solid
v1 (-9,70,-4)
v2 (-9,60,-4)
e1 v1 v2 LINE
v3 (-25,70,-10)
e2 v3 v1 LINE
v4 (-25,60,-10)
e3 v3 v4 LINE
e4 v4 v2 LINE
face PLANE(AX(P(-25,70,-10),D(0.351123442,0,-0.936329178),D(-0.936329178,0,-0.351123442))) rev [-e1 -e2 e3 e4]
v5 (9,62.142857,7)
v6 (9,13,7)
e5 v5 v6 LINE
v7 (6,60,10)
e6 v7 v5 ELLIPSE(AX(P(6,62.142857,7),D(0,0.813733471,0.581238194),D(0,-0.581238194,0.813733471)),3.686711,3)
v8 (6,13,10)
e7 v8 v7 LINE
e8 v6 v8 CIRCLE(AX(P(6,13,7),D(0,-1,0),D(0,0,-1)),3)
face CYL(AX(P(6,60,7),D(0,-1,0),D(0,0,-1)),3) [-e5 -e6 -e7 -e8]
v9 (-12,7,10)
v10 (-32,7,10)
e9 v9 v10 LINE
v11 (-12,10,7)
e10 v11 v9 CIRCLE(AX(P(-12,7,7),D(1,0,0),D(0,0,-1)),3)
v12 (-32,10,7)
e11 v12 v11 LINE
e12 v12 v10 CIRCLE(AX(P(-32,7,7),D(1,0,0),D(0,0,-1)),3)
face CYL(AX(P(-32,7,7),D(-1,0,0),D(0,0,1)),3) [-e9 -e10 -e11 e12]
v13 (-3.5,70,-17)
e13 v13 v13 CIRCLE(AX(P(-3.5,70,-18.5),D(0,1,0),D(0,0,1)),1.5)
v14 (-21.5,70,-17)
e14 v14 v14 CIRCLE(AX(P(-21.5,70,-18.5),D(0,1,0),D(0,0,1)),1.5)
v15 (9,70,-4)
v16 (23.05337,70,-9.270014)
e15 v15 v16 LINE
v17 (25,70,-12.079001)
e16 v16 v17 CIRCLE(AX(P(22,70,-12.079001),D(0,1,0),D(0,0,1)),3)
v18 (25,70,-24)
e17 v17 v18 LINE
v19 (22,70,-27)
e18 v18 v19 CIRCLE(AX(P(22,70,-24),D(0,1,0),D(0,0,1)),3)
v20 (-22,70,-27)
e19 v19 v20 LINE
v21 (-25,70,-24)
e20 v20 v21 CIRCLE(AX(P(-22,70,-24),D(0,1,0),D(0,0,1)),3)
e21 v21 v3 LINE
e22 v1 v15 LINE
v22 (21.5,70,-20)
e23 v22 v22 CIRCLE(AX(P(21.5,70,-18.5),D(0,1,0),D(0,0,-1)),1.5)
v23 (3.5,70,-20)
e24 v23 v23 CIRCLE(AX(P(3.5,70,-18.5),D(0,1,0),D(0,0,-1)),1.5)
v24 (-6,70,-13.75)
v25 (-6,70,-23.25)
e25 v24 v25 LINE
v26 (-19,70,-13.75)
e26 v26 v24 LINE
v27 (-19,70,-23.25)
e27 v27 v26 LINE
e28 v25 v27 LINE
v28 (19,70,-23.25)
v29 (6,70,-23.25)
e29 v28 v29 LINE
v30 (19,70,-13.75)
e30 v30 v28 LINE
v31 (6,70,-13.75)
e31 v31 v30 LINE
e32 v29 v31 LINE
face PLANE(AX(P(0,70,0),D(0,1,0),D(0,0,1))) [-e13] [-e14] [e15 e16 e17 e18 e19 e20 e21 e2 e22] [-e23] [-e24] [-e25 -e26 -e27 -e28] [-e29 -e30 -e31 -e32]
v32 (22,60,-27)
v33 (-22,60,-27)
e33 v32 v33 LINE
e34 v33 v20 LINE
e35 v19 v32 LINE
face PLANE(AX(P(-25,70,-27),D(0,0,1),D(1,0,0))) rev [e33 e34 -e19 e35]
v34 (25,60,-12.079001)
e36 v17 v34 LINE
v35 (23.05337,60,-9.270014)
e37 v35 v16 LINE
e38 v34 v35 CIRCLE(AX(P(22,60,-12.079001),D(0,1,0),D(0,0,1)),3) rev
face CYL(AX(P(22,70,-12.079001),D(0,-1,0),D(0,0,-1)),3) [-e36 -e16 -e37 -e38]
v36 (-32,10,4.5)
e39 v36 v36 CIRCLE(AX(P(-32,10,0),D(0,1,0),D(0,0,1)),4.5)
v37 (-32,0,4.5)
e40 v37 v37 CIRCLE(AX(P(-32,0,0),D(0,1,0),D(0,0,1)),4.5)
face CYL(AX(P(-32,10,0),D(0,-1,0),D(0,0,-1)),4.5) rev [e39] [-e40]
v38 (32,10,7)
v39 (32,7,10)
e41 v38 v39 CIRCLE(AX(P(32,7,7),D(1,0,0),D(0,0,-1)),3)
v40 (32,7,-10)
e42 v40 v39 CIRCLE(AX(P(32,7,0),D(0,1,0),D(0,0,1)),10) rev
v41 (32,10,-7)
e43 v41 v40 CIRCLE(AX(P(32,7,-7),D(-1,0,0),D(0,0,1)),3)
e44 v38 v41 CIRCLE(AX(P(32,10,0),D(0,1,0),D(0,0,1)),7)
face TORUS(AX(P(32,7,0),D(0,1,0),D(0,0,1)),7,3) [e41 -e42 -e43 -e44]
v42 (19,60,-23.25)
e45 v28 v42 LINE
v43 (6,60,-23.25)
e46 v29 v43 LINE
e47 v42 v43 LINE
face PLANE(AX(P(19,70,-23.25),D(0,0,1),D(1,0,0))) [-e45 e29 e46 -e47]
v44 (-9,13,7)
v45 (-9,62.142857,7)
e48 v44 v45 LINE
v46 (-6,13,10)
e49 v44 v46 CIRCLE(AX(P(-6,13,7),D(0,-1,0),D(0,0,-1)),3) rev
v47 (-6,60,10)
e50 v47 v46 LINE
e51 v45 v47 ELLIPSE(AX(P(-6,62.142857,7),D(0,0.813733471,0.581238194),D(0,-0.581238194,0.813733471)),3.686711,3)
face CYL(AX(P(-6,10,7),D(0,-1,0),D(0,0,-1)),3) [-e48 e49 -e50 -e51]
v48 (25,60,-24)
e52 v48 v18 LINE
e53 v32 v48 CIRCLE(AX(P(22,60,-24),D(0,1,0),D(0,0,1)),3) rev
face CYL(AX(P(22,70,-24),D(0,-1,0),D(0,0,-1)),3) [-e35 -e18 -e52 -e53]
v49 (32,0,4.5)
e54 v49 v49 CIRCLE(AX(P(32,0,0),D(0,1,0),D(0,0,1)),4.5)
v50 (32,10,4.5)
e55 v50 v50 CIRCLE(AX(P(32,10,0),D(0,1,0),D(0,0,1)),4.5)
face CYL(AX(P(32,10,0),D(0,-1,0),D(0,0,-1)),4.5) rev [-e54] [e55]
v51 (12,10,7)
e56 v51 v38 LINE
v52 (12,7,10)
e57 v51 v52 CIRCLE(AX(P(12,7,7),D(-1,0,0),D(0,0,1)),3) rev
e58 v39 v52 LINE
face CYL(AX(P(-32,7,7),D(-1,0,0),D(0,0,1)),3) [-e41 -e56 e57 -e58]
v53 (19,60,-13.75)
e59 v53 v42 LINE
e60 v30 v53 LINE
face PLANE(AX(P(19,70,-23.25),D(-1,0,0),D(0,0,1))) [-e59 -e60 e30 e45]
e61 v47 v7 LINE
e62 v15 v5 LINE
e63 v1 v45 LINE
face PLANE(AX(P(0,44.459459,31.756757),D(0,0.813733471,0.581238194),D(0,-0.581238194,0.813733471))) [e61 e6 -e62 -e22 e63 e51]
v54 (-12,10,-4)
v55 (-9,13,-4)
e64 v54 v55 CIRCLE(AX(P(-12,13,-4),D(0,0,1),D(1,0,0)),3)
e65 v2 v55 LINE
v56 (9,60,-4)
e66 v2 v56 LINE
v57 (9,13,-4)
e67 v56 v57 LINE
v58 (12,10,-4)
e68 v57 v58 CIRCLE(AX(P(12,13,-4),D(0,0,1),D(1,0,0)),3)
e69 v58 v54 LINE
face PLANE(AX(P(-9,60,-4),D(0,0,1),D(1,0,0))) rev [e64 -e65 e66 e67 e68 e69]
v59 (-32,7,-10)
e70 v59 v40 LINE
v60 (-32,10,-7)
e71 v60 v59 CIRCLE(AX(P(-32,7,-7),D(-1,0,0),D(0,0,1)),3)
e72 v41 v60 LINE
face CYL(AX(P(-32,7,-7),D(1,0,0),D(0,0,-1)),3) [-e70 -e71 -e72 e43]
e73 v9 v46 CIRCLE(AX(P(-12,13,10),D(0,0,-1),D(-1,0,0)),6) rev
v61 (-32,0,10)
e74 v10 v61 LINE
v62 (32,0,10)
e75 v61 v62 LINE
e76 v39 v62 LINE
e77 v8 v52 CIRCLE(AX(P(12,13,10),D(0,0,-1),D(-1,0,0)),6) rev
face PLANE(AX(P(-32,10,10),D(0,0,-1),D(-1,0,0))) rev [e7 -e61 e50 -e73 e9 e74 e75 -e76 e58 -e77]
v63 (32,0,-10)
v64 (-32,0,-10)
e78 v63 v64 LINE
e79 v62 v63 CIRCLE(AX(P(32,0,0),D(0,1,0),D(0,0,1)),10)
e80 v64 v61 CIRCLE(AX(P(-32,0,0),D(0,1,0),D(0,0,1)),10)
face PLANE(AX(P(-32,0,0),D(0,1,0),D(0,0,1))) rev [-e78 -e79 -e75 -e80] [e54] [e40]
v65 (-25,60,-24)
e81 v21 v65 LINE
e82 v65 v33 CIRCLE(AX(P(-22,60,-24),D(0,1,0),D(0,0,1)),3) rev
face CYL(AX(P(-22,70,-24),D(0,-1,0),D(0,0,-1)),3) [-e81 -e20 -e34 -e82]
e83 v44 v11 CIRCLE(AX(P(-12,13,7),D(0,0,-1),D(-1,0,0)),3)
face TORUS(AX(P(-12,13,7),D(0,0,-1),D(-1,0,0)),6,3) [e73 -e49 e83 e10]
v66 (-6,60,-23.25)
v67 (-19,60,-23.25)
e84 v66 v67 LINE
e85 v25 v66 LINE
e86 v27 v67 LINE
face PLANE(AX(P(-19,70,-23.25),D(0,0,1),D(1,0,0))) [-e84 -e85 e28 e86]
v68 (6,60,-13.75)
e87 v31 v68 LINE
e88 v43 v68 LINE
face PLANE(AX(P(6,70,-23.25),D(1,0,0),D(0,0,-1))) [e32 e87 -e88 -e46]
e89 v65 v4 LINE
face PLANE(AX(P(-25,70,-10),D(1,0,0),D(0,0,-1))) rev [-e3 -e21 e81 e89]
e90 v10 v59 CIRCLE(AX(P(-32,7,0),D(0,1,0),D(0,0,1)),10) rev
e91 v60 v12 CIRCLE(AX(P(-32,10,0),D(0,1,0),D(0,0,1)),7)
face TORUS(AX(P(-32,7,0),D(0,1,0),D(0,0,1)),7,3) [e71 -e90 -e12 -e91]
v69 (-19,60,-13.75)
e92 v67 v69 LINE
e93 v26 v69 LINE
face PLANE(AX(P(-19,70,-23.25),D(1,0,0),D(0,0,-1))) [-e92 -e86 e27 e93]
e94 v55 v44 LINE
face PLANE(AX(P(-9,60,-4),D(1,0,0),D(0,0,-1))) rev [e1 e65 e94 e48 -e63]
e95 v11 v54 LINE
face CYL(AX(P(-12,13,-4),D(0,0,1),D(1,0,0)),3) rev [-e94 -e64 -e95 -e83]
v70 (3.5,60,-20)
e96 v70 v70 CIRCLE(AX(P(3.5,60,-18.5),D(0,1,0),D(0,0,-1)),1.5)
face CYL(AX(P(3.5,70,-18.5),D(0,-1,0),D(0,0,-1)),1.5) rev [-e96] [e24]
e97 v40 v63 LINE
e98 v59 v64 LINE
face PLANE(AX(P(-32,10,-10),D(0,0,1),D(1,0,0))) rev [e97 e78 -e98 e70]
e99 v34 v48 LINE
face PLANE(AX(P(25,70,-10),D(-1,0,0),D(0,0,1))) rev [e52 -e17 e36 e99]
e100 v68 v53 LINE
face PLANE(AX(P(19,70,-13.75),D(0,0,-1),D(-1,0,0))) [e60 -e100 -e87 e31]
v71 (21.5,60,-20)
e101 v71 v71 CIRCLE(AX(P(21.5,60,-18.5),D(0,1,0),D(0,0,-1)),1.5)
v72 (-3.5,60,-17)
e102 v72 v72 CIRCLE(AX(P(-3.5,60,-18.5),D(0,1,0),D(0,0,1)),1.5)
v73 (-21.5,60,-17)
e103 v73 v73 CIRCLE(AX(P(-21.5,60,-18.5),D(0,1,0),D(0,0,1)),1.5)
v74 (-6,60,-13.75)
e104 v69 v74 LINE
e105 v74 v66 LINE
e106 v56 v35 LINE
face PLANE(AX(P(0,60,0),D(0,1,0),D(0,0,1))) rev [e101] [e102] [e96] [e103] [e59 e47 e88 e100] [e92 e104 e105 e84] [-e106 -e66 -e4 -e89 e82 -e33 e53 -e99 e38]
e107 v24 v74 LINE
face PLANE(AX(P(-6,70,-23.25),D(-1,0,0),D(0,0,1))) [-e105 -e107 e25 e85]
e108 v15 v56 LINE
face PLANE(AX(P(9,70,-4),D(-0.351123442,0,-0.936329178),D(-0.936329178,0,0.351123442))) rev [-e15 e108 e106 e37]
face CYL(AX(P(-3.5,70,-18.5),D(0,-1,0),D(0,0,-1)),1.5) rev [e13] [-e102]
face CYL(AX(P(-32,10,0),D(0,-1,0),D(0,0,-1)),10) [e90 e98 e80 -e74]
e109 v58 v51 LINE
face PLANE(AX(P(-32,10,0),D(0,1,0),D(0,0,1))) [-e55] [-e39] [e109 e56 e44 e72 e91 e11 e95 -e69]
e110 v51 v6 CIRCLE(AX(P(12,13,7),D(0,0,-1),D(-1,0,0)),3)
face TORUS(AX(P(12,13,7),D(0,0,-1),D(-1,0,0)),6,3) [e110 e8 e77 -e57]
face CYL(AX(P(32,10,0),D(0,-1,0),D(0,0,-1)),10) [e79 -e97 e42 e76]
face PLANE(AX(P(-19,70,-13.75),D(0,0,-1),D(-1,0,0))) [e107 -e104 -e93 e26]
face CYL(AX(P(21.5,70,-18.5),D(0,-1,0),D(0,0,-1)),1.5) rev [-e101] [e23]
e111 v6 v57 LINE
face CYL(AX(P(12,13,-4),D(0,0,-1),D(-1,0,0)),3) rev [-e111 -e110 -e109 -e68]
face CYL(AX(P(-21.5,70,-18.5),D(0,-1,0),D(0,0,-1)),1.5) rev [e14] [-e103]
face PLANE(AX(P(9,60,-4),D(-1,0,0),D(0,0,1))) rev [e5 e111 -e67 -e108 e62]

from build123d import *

# Parameters (mm, degrees)
SKETCH1_R           = 4.5
BOSS_EXTRUDE1_DEPTH = 10
SKETCH2_W           = 18
SKETCH2_H           = 14
BOSS_EXTRUDE2_DEPTH = 50
SKETCH4_R           = 1.5
SKETCH4_W           = 13
SKETCH4_H           = 9.5
BOSS_EXTRUDE3_DEPTH = 10
LOFT2_START         = -9
LOFT2_DEPTH         = 18
FILLET4_R           = 3


# Read off the part's stored shape, not the designer's step: Loft2
with BuildPart() as part:
    # Sketch1 → Boss-Extrude1 (new body)
    with BuildSketch(Plane(origin=(0, 0, 0), x_dir=(1, 0, 0), z_dir=(0, 1, 0))):
        with BuildLine():
            Line((-32, 10), (32, 10))
            ThreePointArc((32, 10), (42, 0), (32, -10))
            Line((32, -10), (-32, -10))
            ThreePointArc((-32, -10), (-42, 0), (-32, 10))
        make_face()
        with Locations(Location((-32, 0, 0), (0, 0, 270))):
            Circle(SKETCH1_R, mode=Mode.SUBTRACT)
        with Locations(Location((32, 0, 0), (0, 0, 270))):
            Circle(SKETCH1_R, mode=Mode.SUBTRACT)
    extrude(amount=BOSS_EXTRUDE1_DEPTH)

    # Sketch2 → Boss-Extrude2 (add)
    with BuildSketch(Plane(origin=(0, 10, 0), x_dir=(1, 0, 0), z_dir=(0, 1, 0))):
        with Locations((0, -3)):
            Rectangle(SKETCH2_W, SKETCH2_H)
    extrude(amount=BOSS_EXTRUDE2_DEPTH)



with BuildPart() as body_2:
    # Sketch4 → Boss-Extrude3 (new body)
    with BuildSketch(Plane(origin=(0, 60, 0), x_dir=(1, 0, 0), z_dir=(0, 1, 0))):
        Polygon((-25, 10), (-25, 27), (0, 27), (25, 27), (25, 10), (9, 4), (-9, 4), align=None)
        with Locations(Location((-21.5, 18.5, 0), (0, 0, 270))):
            Circle(SKETCH4_R, mode=Mode.SUBTRACT)
        with Locations(Location((-3.5, 18.5, 0), (0, 0, 270))):
            Circle(SKETCH4_R, mode=Mode.SUBTRACT)
        with Locations(Location((3.5, 18.5, 0), (0, 0, 90))):
            Circle(SKETCH4_R, mode=Mode.SUBTRACT)
        with Locations(Location((21.5, 18.5, 0), (0, 0, 90))):
            Circle(SKETCH4_R, mode=Mode.SUBTRACT)
        with Locations((-12.5, 18.5)):
            Rectangle(SKETCH4_W, SKETCH4_H, mode=Mode.SUBTRACT)
        with Locations((12.5, 18.5)):
            Rectangle(SKETCH4_W, SKETCH4_H, mode=Mode.SUBTRACT)
    extrude(amount=BOSS_EXTRUDE3_DEPTH)


with BuildPart() as part_1:
    add(part.part)

    add(body_2.part)  # Loft2 merges body 2
    # Loft2 outline → Loft2 (add)
    with BuildSketch(Plane.YZ.offset(LOFT2_START)):
        Polygon((60, -4), (70, -4), (60, 10), align=None)
    extrude(amount=LOFT2_DEPTH)

    # Fillet4
    fillet4_edges = [part_1.edges().sort_by_distance(p)[0] for p in [
        (0, 10, -10),
        (-42, 10, 0),
        (42, 10, 0),
        (9, 35, 10),
        (9, 10, 3),
        (-9, 10, 3),
        (20.5, 10, 10),
        (-20.5, 10, 10),
        (25, 65, -10),
        (25, 65, -27),
        (-25, 65, -27),
        (-9, 35, 10),
    ]]
    fillet(fillet4_edges, radius=FILLET4_R)


solid = part_1.part
